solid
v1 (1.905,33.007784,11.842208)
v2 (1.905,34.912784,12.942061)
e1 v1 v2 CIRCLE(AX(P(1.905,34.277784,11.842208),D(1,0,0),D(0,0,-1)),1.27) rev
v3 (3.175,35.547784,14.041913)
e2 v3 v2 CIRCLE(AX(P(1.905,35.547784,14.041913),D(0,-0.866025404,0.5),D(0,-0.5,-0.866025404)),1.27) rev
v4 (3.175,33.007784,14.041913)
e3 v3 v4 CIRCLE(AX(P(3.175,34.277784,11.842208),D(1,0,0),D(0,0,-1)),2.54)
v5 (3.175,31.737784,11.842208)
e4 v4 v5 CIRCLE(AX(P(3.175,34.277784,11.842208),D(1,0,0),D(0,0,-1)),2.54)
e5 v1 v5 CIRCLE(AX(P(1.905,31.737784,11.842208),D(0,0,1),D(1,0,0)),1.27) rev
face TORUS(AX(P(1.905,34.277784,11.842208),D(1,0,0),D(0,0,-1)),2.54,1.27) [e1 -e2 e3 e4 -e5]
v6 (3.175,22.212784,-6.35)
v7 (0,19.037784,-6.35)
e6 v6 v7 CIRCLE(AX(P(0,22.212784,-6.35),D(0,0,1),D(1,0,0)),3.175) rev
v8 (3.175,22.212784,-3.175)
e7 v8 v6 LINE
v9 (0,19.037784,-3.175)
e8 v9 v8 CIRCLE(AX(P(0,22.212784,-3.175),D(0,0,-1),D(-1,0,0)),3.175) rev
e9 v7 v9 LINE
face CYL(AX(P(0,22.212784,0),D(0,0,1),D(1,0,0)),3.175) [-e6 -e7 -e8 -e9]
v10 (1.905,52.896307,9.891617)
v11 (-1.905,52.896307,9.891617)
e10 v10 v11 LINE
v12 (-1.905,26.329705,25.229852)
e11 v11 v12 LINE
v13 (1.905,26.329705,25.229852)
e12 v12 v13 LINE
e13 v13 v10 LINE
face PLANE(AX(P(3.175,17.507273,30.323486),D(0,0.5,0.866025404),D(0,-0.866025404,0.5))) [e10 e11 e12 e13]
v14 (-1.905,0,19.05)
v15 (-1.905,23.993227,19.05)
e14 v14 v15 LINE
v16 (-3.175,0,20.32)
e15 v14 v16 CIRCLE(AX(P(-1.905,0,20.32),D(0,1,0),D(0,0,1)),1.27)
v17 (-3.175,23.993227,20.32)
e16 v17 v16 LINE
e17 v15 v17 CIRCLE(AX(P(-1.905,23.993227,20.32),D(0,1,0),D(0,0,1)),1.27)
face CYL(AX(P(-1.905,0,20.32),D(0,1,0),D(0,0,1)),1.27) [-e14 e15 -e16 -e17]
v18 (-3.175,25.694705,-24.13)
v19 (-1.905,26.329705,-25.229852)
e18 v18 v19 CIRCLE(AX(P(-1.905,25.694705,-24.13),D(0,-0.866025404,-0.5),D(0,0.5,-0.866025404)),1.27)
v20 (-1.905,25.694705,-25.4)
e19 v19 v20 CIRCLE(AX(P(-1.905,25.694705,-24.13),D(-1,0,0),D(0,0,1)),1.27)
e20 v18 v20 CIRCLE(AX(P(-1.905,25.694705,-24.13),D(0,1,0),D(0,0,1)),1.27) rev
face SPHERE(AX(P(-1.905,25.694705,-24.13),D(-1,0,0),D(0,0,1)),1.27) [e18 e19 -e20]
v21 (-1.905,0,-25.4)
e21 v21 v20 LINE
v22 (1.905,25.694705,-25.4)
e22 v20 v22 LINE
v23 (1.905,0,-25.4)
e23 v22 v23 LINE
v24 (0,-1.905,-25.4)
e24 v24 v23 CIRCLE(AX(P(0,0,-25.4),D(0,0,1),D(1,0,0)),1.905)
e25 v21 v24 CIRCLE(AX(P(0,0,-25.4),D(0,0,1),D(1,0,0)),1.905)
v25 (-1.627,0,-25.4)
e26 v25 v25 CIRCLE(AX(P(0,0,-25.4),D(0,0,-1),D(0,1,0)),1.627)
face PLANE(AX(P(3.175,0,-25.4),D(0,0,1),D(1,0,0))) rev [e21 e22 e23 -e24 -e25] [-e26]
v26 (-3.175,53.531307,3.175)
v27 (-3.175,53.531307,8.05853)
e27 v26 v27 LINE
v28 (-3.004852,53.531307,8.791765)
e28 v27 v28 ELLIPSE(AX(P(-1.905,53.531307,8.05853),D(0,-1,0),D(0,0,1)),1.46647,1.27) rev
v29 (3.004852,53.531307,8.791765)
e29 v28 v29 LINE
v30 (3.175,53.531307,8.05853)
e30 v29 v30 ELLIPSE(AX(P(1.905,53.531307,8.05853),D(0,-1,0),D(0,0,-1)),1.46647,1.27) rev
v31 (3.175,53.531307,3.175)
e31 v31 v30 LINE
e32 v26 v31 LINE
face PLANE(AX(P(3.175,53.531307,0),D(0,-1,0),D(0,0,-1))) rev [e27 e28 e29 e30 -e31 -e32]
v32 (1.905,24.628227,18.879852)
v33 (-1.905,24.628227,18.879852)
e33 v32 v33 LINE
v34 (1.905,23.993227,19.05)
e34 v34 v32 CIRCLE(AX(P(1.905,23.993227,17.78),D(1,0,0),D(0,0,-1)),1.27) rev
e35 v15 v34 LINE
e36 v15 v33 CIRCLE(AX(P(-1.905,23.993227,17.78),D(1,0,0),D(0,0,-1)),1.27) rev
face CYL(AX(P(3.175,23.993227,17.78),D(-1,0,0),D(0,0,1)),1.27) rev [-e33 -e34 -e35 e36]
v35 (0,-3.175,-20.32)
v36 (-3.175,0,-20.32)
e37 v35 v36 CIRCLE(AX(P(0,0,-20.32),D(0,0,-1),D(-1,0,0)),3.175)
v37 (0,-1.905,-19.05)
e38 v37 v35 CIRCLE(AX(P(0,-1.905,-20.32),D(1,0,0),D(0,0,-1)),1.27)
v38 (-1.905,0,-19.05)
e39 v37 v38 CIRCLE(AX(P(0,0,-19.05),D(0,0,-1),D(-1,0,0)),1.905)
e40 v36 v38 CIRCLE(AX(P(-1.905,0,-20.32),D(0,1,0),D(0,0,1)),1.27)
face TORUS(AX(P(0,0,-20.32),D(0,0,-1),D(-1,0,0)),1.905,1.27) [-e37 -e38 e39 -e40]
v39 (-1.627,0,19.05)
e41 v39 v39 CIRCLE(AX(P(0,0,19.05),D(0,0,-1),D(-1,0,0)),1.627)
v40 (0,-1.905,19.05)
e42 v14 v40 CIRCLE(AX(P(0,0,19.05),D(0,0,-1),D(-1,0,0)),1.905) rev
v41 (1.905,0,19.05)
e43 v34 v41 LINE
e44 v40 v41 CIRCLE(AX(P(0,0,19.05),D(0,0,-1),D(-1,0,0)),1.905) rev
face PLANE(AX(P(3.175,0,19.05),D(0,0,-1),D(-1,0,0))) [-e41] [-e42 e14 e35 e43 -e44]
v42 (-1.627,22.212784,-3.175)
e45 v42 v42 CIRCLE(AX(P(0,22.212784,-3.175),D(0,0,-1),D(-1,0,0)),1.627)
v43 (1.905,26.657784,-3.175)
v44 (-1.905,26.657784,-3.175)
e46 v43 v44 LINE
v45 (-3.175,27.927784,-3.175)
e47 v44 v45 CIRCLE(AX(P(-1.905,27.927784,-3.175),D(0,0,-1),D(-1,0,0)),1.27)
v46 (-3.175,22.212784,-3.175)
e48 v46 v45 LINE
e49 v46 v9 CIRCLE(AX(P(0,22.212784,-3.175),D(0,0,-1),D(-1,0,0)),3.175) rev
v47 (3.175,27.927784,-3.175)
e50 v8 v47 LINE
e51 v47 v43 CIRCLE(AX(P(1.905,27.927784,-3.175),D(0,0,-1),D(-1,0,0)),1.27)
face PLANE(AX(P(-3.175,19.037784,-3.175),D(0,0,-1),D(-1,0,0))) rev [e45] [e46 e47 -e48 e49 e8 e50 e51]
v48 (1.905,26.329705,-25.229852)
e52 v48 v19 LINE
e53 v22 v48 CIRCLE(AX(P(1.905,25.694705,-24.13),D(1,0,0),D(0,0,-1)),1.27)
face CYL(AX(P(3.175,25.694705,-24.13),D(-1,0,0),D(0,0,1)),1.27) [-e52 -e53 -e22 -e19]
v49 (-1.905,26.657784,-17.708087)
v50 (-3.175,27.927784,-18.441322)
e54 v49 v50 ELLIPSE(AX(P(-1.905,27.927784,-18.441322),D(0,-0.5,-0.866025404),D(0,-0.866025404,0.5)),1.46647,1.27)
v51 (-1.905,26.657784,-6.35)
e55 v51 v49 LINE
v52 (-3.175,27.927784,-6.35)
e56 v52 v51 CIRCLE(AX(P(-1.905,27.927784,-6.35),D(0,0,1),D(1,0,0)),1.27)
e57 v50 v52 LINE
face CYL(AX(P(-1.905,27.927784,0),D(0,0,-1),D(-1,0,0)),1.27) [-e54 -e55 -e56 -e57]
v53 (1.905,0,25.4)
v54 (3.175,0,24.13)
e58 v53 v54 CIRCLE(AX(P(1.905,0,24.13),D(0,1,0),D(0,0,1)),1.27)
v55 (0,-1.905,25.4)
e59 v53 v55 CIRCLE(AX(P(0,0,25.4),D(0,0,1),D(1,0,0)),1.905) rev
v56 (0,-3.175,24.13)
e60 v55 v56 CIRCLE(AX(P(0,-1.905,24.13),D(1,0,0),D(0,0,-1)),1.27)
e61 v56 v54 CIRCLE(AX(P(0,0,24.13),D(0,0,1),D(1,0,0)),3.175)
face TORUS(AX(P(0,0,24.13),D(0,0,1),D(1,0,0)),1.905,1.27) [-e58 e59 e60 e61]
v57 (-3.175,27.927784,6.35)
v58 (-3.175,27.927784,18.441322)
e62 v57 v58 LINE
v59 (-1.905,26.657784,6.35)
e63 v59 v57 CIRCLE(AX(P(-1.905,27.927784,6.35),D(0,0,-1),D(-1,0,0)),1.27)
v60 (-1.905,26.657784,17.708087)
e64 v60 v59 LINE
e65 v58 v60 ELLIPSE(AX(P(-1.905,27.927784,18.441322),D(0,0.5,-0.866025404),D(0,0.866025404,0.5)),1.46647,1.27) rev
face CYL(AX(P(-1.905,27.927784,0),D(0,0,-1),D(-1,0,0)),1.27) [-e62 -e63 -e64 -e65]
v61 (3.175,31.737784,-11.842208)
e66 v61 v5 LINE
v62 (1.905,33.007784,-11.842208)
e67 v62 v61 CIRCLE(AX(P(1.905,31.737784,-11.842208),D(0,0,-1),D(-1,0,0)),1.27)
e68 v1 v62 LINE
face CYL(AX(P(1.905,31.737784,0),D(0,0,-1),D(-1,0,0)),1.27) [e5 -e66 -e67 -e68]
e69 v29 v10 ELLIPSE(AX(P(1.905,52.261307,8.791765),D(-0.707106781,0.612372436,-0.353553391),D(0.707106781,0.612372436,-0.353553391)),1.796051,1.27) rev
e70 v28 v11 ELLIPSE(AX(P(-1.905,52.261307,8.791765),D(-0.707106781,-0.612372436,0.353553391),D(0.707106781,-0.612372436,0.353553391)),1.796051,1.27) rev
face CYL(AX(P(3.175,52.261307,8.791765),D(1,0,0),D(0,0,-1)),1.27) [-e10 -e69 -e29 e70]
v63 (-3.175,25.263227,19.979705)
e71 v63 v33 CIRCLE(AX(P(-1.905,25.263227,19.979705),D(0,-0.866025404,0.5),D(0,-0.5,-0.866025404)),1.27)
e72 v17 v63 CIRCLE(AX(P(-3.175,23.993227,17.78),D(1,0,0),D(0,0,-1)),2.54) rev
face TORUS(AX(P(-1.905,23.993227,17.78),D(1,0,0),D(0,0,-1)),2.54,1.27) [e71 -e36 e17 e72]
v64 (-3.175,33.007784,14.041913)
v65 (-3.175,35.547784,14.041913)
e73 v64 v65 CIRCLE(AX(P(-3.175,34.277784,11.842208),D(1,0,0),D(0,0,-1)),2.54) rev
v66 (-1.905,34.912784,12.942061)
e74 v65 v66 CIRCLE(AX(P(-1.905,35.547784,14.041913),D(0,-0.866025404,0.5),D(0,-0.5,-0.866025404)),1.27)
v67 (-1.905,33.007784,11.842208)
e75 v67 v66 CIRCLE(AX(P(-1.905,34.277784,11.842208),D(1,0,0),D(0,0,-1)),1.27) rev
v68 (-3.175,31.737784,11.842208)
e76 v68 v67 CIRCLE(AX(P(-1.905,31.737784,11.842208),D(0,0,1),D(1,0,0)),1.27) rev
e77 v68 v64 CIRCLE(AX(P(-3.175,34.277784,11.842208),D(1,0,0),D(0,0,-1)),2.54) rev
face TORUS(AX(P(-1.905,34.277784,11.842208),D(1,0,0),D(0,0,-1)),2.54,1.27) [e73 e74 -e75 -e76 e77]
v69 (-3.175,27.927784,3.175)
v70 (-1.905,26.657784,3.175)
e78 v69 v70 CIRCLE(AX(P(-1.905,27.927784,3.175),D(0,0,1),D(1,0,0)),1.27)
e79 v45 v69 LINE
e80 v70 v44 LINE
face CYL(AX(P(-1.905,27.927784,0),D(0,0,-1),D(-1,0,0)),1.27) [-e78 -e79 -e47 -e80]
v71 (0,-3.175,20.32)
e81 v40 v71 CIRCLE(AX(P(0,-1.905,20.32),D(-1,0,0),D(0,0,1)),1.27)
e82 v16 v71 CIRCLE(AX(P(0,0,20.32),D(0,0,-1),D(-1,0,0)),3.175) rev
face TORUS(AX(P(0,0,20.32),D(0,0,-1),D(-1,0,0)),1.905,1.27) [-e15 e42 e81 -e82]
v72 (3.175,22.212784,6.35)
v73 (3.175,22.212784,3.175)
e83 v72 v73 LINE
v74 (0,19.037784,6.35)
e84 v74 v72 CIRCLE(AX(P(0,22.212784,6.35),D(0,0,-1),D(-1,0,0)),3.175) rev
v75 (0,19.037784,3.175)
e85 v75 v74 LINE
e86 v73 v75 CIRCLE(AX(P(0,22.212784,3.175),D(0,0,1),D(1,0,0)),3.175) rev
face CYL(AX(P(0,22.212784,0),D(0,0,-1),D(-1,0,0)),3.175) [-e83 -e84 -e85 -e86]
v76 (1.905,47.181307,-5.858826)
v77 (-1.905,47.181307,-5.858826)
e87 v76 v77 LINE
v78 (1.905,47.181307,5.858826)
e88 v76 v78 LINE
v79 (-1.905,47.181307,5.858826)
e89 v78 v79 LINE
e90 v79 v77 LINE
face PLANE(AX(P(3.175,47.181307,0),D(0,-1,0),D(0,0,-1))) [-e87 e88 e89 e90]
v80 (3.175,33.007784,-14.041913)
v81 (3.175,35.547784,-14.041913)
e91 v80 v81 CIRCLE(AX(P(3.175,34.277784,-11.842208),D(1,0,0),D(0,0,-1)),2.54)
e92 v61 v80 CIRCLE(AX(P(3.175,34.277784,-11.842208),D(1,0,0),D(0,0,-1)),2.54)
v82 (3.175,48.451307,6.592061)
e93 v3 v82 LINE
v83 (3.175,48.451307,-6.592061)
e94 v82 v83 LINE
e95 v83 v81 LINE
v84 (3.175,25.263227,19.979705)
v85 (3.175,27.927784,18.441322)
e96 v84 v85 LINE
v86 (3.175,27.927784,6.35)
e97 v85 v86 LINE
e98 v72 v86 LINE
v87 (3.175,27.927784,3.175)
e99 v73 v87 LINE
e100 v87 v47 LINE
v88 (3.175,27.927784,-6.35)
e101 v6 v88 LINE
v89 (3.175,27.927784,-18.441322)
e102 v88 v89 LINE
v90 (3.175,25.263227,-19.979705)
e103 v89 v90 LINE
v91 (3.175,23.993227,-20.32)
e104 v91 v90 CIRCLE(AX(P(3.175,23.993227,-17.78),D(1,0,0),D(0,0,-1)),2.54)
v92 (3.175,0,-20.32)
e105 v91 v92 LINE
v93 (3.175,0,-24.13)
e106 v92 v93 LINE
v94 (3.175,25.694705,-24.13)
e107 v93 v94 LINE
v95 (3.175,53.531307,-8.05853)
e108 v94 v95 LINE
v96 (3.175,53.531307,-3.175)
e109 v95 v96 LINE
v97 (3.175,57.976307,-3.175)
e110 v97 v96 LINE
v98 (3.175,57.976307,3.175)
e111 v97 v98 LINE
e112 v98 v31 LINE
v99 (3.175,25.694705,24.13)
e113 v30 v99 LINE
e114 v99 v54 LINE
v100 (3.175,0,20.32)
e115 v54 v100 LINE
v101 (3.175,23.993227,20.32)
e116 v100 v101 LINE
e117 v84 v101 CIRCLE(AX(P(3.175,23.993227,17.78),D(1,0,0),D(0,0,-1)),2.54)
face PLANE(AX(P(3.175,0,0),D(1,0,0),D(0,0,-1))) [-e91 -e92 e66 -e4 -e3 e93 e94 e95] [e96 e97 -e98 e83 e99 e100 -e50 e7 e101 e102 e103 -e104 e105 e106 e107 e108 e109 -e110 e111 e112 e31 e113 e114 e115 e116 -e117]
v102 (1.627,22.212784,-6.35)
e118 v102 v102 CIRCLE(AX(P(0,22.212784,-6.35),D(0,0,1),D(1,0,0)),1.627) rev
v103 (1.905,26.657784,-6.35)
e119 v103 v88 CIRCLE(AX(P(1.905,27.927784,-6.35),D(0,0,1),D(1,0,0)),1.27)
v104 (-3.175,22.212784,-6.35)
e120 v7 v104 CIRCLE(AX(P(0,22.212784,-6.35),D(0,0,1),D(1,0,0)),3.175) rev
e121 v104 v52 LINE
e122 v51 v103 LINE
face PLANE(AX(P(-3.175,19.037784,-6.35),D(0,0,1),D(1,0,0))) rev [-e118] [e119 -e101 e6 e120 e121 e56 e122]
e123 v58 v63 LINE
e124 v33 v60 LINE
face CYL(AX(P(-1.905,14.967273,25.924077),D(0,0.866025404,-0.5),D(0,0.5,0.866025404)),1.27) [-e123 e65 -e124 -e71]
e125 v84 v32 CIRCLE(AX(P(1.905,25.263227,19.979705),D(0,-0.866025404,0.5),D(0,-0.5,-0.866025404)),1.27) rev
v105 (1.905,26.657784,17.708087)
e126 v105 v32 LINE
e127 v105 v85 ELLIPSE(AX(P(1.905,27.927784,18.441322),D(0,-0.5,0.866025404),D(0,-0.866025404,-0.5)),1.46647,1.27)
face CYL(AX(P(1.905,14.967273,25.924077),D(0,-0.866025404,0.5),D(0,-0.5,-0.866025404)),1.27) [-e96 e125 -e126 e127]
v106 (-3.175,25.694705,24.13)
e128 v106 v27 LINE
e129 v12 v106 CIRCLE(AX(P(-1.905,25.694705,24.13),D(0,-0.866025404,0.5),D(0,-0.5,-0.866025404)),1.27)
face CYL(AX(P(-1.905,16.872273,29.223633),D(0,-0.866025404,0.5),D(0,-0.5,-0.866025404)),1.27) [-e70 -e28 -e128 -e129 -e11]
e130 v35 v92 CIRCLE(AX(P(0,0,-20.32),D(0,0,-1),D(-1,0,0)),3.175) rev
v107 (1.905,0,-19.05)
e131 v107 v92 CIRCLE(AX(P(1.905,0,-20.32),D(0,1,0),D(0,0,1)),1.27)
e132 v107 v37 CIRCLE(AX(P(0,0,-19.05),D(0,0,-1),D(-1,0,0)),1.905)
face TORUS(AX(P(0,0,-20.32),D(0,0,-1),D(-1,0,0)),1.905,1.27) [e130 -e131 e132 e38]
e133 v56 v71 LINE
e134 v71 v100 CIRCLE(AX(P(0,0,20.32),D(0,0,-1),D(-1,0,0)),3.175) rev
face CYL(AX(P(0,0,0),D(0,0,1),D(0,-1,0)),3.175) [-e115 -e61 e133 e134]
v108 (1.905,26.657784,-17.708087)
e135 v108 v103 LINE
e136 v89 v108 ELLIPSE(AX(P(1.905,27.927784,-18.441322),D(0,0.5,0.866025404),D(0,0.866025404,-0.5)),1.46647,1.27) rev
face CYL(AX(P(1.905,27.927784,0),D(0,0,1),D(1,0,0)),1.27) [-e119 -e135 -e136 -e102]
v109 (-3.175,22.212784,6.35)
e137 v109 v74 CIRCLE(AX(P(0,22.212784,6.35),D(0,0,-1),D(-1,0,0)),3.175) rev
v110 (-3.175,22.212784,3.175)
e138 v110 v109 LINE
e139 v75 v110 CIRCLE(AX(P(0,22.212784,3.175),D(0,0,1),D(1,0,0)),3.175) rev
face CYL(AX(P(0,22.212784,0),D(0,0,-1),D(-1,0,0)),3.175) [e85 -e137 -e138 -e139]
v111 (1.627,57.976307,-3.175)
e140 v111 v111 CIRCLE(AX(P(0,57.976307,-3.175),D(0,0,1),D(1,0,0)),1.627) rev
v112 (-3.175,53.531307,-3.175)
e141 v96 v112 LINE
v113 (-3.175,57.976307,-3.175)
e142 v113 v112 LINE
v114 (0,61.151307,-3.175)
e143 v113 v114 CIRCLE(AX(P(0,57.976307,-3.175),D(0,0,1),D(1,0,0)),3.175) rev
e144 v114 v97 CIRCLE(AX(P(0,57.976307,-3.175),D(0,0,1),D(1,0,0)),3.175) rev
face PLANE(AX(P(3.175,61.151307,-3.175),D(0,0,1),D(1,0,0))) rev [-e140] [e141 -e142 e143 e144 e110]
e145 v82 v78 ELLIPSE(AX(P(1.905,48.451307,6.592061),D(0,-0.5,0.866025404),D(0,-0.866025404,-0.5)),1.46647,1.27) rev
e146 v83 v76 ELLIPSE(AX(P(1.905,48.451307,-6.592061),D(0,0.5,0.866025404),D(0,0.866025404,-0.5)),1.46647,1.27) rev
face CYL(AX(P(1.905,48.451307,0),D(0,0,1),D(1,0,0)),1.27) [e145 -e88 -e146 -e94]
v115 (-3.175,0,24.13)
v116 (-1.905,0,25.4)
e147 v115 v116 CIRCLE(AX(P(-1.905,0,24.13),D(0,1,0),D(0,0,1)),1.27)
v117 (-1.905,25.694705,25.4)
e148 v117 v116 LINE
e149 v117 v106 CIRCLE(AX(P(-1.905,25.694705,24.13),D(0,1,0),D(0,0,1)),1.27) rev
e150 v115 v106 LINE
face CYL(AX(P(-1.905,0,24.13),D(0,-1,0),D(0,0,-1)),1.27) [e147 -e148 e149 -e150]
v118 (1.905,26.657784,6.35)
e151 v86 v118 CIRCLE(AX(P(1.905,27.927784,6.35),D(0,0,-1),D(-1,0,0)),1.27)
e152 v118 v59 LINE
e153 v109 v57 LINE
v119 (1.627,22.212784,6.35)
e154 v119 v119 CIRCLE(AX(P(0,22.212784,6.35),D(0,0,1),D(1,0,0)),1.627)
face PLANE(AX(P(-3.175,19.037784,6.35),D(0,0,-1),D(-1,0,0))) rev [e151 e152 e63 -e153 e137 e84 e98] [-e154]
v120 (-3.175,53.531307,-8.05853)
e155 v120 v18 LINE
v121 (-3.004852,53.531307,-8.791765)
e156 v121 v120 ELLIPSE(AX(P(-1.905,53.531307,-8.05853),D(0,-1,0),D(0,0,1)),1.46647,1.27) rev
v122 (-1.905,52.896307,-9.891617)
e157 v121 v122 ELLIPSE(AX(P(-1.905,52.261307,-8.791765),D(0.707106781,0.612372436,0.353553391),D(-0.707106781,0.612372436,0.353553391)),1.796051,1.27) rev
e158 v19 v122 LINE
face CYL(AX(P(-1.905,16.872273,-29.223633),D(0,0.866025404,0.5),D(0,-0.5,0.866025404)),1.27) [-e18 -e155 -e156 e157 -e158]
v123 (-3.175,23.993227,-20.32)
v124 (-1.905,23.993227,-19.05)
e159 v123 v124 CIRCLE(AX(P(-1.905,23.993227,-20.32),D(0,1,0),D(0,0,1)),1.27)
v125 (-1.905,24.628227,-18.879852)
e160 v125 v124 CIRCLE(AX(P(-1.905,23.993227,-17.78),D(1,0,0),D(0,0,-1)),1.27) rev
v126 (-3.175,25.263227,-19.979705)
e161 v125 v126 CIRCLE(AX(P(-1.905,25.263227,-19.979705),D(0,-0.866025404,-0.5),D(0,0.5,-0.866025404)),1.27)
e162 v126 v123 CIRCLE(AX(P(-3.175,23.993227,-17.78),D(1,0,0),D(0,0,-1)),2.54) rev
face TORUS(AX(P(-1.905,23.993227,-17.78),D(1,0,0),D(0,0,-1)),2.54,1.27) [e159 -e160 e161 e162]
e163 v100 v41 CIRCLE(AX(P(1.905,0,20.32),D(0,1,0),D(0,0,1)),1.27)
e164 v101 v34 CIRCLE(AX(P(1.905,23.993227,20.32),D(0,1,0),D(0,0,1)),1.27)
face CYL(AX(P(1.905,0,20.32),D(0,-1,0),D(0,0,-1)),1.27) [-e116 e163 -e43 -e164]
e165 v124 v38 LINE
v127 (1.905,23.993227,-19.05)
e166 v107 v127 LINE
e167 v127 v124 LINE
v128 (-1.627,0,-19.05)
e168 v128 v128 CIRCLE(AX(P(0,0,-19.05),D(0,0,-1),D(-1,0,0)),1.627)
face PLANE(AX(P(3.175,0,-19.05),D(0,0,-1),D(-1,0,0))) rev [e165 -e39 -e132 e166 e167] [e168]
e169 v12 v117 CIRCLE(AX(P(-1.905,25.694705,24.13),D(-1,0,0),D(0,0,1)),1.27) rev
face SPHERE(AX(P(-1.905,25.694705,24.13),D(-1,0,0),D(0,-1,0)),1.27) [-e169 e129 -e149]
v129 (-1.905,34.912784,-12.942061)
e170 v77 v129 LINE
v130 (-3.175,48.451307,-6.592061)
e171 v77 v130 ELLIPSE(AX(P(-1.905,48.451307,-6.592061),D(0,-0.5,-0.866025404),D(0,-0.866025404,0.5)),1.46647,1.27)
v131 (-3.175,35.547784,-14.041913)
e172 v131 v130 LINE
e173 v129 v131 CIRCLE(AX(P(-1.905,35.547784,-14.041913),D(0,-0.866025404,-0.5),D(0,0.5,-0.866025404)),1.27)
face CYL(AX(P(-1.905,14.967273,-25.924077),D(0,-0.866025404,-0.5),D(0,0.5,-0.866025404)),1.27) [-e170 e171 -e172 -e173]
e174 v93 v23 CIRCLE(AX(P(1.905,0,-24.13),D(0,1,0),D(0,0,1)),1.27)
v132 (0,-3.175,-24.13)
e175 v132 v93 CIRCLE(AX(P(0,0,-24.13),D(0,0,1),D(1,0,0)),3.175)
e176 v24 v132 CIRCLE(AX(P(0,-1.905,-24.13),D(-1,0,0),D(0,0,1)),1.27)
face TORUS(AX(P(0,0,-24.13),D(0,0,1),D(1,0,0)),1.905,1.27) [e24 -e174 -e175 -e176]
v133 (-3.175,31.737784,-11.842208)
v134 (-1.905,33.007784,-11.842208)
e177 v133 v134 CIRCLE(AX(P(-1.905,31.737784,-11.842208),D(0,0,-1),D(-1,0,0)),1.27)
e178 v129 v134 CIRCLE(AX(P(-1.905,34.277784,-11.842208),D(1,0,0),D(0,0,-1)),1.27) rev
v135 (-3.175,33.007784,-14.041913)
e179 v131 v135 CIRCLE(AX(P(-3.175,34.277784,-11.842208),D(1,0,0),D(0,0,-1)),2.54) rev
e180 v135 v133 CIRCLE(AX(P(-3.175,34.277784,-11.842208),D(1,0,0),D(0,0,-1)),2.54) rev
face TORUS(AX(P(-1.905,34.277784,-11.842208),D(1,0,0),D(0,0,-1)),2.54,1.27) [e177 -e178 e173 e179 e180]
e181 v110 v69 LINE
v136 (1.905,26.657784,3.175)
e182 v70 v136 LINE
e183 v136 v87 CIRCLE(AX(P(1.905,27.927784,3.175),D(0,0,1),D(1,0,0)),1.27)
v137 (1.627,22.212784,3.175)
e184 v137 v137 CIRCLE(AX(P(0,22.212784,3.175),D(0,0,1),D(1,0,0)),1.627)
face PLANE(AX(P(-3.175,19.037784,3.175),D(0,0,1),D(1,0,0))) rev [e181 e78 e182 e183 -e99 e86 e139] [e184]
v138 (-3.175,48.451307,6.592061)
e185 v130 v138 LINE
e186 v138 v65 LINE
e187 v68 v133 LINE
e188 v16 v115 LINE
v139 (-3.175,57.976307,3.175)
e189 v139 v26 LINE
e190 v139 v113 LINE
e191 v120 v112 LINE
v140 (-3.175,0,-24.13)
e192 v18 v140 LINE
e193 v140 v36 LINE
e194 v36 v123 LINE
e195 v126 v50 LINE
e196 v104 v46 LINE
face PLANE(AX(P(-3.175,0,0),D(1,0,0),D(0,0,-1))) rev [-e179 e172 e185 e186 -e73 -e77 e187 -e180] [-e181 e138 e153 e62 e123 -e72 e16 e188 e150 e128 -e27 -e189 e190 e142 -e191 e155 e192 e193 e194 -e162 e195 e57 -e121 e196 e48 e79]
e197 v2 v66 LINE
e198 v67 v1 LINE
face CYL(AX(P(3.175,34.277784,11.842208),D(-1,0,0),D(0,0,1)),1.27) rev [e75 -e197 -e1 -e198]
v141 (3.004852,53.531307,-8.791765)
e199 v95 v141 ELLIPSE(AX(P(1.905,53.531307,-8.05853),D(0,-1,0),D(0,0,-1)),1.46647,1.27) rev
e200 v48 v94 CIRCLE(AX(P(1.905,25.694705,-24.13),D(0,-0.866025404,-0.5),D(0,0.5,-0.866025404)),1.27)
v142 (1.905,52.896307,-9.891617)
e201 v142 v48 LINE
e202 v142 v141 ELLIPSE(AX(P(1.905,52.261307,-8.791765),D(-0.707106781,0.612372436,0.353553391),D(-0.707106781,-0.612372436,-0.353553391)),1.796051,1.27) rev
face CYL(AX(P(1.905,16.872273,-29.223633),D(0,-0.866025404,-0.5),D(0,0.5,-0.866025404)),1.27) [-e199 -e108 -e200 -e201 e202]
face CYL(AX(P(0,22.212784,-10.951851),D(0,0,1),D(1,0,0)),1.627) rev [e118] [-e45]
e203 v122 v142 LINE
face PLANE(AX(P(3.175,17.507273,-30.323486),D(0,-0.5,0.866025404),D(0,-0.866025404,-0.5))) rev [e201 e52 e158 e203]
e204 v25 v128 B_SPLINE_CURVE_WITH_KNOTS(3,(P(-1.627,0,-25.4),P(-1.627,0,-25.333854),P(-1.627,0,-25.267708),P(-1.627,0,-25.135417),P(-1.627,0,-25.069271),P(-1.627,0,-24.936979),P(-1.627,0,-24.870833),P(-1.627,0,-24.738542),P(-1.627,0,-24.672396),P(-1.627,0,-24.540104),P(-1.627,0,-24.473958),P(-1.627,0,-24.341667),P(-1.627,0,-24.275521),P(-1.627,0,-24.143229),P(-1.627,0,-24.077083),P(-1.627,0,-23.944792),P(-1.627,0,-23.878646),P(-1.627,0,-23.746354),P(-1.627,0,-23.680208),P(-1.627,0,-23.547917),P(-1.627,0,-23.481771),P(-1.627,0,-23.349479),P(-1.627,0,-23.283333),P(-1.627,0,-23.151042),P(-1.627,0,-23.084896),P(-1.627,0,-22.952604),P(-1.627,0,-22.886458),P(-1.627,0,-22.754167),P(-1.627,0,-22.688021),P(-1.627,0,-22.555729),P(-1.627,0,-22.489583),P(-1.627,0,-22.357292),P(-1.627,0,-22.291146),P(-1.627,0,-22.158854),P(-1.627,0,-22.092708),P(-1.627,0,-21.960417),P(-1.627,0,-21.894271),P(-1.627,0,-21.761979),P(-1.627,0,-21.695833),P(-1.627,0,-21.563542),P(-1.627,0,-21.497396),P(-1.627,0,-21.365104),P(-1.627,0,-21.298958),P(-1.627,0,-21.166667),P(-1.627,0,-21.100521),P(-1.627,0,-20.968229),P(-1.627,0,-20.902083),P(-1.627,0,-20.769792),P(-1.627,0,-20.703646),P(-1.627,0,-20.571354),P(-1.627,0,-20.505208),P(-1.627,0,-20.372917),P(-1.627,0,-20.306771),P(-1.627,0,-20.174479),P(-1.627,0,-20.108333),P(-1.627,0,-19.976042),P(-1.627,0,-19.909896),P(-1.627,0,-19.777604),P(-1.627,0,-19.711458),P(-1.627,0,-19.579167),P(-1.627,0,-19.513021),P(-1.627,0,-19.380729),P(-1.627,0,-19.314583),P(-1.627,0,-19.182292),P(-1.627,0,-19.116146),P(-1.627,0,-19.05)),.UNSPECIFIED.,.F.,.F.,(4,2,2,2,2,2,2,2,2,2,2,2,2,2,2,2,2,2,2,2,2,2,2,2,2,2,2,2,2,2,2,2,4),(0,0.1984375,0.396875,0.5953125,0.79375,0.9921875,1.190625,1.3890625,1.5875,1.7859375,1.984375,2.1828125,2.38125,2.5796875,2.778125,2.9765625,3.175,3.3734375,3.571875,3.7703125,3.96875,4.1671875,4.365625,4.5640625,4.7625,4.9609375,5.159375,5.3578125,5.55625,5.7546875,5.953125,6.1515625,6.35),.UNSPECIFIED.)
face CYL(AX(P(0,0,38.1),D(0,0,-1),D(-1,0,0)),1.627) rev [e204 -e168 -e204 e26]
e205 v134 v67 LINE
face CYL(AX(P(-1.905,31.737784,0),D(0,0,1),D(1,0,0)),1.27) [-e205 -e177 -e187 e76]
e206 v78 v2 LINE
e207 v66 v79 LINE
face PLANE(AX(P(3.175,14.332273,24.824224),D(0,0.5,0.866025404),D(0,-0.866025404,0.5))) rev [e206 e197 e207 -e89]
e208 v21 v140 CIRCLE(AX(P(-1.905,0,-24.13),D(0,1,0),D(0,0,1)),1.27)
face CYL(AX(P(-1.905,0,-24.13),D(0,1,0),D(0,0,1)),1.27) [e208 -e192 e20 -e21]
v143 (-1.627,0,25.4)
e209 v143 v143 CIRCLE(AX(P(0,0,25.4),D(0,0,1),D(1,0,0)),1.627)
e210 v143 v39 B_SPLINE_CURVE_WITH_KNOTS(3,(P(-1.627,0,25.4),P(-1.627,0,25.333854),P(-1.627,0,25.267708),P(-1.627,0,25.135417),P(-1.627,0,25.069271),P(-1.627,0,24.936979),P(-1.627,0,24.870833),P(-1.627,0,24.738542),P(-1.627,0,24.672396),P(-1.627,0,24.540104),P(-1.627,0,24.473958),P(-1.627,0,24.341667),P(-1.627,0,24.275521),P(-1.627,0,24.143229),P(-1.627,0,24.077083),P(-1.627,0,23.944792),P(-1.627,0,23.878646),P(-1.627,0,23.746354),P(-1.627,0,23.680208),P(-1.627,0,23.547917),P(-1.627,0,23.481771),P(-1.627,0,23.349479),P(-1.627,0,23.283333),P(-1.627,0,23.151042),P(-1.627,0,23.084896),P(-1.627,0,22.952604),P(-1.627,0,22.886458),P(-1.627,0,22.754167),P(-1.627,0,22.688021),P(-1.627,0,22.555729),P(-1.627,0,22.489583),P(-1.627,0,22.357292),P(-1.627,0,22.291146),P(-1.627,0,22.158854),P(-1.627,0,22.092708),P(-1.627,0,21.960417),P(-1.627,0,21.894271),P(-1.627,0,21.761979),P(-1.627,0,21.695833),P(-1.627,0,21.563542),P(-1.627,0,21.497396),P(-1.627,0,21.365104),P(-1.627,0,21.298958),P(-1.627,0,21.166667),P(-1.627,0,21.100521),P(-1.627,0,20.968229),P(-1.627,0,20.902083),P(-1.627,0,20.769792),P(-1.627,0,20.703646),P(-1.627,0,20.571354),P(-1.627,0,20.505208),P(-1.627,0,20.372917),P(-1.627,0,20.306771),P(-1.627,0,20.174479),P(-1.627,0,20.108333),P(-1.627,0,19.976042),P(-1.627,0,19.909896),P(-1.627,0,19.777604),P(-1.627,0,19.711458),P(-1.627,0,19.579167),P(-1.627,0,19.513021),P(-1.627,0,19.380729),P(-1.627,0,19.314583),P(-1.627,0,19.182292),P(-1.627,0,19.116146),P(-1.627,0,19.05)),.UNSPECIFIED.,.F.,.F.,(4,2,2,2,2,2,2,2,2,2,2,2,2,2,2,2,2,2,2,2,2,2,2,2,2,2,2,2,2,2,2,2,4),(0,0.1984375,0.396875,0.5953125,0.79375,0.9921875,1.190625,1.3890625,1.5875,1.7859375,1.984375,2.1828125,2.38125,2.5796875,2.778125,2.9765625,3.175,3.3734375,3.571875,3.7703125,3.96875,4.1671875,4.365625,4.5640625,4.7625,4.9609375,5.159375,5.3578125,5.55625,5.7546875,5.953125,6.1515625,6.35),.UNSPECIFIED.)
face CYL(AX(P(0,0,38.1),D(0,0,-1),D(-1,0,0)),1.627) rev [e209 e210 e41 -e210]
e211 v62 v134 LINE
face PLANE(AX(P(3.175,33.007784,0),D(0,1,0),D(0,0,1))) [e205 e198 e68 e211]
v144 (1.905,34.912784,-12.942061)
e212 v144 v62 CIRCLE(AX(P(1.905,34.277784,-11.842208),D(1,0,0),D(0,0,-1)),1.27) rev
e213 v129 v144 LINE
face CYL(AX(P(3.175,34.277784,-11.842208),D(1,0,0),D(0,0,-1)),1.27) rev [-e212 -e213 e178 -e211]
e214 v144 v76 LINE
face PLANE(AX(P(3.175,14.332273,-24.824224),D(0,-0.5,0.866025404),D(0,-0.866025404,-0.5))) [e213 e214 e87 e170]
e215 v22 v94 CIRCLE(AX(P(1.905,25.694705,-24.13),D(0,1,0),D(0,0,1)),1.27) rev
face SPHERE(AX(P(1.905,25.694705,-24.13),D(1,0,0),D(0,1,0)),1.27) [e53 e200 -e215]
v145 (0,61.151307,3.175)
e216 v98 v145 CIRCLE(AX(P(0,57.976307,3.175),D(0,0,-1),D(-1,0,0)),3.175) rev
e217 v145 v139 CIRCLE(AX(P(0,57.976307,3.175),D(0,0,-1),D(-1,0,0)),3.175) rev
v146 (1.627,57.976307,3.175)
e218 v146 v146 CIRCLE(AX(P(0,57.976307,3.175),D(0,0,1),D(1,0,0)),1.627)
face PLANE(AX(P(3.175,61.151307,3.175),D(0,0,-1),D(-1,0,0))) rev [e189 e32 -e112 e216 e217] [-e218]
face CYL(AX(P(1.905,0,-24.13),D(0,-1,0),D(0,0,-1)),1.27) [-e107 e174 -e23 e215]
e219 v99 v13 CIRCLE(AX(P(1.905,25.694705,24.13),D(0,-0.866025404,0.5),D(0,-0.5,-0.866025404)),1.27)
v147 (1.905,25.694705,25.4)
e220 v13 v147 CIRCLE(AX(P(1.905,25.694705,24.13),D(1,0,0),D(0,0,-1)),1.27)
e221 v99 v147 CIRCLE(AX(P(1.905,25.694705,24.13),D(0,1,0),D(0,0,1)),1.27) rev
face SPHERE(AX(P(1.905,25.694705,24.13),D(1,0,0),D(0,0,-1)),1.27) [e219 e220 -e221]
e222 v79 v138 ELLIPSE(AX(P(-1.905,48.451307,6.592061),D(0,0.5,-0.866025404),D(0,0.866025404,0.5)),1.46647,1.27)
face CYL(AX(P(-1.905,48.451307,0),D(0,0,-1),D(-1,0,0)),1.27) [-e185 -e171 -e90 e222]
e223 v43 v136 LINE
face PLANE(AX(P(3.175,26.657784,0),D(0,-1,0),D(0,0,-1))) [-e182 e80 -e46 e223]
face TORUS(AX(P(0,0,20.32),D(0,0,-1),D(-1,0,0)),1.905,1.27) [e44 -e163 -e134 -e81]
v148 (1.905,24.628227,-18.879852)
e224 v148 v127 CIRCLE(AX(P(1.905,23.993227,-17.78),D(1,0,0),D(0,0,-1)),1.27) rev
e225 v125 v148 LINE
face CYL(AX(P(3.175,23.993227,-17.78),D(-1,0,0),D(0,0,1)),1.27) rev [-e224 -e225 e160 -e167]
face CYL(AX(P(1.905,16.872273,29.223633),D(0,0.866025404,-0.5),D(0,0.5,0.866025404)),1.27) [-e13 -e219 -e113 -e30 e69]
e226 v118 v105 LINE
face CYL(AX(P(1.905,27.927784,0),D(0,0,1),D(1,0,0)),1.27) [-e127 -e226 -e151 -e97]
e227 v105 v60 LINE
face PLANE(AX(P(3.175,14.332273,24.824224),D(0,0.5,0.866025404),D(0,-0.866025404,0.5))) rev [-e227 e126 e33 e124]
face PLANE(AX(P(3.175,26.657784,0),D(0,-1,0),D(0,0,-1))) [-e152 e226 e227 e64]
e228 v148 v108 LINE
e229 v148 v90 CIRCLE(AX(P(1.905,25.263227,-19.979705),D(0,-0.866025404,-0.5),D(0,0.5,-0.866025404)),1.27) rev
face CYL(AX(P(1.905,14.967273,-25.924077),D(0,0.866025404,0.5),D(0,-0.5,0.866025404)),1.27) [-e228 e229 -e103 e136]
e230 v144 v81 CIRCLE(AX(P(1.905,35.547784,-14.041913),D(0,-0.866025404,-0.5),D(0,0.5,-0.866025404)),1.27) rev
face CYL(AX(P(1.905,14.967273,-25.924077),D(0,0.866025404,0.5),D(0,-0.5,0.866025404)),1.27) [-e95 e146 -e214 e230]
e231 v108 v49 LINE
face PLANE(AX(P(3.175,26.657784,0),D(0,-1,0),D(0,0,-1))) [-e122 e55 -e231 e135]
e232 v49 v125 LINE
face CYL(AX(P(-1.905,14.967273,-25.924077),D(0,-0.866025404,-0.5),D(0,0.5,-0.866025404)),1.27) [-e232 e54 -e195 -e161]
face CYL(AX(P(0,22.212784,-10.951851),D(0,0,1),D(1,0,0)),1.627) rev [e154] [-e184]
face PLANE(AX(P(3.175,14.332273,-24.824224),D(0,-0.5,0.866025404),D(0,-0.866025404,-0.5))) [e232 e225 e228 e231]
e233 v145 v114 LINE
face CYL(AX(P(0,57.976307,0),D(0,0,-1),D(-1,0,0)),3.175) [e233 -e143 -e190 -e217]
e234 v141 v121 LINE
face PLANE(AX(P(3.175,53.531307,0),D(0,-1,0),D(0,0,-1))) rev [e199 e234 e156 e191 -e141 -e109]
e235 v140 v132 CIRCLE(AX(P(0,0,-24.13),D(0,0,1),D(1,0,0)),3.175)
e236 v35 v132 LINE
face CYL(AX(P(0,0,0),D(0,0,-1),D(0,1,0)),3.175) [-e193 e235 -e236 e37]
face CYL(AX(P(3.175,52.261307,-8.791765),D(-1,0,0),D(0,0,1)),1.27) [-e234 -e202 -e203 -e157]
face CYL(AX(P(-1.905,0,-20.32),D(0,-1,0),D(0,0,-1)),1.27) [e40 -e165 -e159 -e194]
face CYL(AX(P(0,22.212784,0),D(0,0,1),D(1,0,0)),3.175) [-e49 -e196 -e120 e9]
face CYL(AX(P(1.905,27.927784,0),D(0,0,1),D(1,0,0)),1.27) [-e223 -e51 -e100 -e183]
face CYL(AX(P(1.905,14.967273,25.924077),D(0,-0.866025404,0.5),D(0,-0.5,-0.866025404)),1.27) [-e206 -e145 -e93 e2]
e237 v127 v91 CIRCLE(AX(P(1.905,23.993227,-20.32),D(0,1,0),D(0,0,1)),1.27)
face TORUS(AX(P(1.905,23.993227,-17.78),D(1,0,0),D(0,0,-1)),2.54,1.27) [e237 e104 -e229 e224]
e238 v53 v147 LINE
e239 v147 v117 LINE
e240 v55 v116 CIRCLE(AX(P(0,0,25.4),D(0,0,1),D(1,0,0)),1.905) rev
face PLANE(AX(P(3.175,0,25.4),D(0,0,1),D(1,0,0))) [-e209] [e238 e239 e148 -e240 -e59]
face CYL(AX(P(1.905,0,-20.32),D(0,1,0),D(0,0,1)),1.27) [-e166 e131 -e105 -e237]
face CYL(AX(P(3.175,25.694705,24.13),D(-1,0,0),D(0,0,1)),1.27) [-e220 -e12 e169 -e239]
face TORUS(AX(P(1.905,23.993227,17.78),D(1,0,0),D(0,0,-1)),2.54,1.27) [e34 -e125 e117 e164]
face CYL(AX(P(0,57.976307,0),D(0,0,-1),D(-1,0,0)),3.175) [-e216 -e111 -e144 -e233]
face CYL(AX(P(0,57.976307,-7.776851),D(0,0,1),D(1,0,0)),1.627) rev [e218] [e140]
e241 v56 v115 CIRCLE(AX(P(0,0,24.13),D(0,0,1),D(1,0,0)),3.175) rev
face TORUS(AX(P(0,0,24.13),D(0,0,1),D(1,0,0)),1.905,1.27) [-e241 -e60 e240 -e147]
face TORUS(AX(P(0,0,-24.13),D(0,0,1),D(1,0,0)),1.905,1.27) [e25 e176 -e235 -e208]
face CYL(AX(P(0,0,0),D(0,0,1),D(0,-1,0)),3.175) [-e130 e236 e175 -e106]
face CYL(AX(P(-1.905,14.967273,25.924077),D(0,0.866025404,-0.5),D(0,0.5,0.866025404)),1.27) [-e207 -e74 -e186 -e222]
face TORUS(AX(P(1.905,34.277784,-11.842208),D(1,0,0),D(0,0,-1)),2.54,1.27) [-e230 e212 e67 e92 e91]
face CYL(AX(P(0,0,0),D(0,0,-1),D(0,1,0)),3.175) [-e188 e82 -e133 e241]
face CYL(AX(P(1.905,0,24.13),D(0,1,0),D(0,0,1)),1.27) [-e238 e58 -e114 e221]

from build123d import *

# Parameters (mm, degrees)
BOSS_EXTRUDE1_DEPTH = 3.175
SKETCH4_W           = 6.35
SKETCH4_H           = 3.175
BOSS_EXTRUDE3_DEPTH = 7.62
FILLET2_R           = 1.27
SKETCH8_W           = 6.35
SKETCH8_H           = 6.35
BOSS_EXTRUDE5_DEPTH = 7.62
SKETCH7_R           = 1.627
CUT_EXTRUDE3_DEPTH  = 63.5
FILLET3_R           = 3.175
SKETCH9_R           = 1.627
CUT_EXTRUDE4_DEPTH  = 6.35
CUT_EXTRUDE5_REACH  = 70.976
SKETCH10_R          = 1.627


with BuildPart() as part:
    # Sketch2 → Boss-Extrude1 (new, symmetric)
    with BuildSketch(Plane(origin=(0, 0, 0), x_dir=(0, 0, -1), z_dir=(1, 0, 0))):
        Polygon((-25.4, 26.035), (-25.4, 3.175), (-25.4, -3.175), (-19.05, -3.175), (-19.05, 3.175), (-19.05, 9.525), (-19.05, 24.333522628), (-17.708087105, 26.657783942), (17.708087105, 26.657783942), (19.05, 24.333522628), (19.05, 3.175), (19.05, -3.175), (25.4, -3.175), (25.4, 3.175), (25.4, 26.035), (9.525, 53.53130657), (0, 53.53130657), (-9.525, 53.53130657), align=None)
        Polygon((-14.041912895, 33.007783942), (-5.858825791, 47.18130657), (0, 47.18130657), (5.858825791, 47.18130657), (14.041912895, 33.007783942), align=None, mode=Mode.SUBTRACT)
    extrude(amount=BOSS_EXTRUDE1_DEPTH, both=True)

    # Sketch4 → Boss-Extrude3 (add)
    with BuildSketch(Plane.XZ.offset(-26.657783942)):
        with Locations((0, -4.7625)):
            Rectangle(SKETCH4_W, SKETCH4_H)
        with Locations((0, 4.7625)):
            Rectangle(SKETCH4_W, SKETCH4_H)
    extrude(amount=BOSS_EXTRUDE3_DEPTH)

    # Fillet2
    fillet2_edges = [part.edges().sort_by_distance(p)[0] for p in [
        (3.175, 40.094545256, -9.950369343),
        (3.175, 33.007783942, 0),
        (-3.175, 26.657783942, -12.029043552),
        (-3.175, 25.495653285, 18.379043552),
        (-3.175, 10.579261314, 19.05),
        (-3.175, 11.43, 25.4),
        (-3.175, 39.783153285, 17.4625),
        (-3.175, 39.783153285, -17.4625),
        (3.175, 40.094545256, 9.950369343),
        (-3.175, 11.43, -25.4),
        (-3.175, 10.579261314, -19.05),
        (-3.175, 25.495653285, -18.379043552),
        (-3.175, 40.094545256, 9.950369343),
        (-3.175, 33.007783942, 0),
        (-3.175, 40.094545256, -9.950369343),
        (-3.175, 47.18130657, 0),
        (3.175, 25.495653285, -18.379043552),
        (0, 24.333522628, 19.05),
        (0, -3.175, 19.05),
        (3.175, 10.579261314, -19.05),
        (0, -3.175, 25.4),
        (0, 26.035, 25.4),
        (0, 53.53130657, 9.525),
        (0, 53.53130657, -9.525),
        (0, 26.035, -25.4),
        (0, -3.175, -25.4),
        (0, -3.175, -19.05),
        (0, 24.333522628, -19.05),
        (0, 33.007783942, 14.041912895),
        (0, 33.007783942, -14.041912895),
        (3.175, 11.43, -25.4),
        (3.175, 39.783153285, -17.4625),
        (-3.175, 26.657783942, 12.029043552),
        (3.175, 26.657783942, 12.029043552),
        (3.175, 39.783153285, 17.4625),
        (3.175, 11.43, 25.4),
        (-3.175, 26.657783942, 0),
        (3.175, 26.657783942, 0),
        (3.175, 47.18130657, 0),
        (3.175, 10.579261314, 19.05),
        (3.175, 25.495653285, 18.379043552),
        (3.175, 26.657783942, -12.029043552),
    ]]
    fillet(fillet2_edges, radius=FILLET2_R)

    # Sketch8 → Boss-Extrude5 (add)
    with BuildSketch(Plane(origin=(0, 53.53130657, 0), x_dir=(1, 0, 0), z_dir=(0, 1, 0))):
        Rectangle(SKETCH8_W, SKETCH8_H)
    extrude(amount=BOSS_EXTRUDE5_DEPTH)

    # Sketch7 → Cut-Extrude3 (cut)
    with BuildSketch(Plane(origin=(0, 0, -25.4), x_dir=(-1, 0, 0), z_dir=(0, 0, -1))):
        Circle(SKETCH7_R)
    extrude(amount=-CUT_EXTRUDE3_DEPTH, mode=Mode.SUBTRACT)

    # Fillet3
    # the kernel refuses this fillet: 3.175 mm, written as the material it takes off along each edge
    with BuildSketch(Plane(origin=(0, 0, 25.4), x_dir=(0, -1, 0), z_dir=(-1, 0, 0))) as fillet3_piece_1:
        with BuildLine():
            CenterArc((1.905, -1.27), 1.27, 0, 90)
            Line((3.175, -1.27), (3.175, 0))
            Line((3.175, 0), (1.905, 0))
        make_face()
    revolve(axis=Axis((0, 0, 25.4), (0, 0, 1)), revolution_arc=90, mode=Mode.SUBTRACT)
    with BuildSketch(Plane(origin=(0, 0, 19.05), x_dir=(1, 0, 0), z_dir=(0, 1, 0))) as fillet3_piece_2:
        with BuildLine():
            CenterArc((1.905, -1.27), 1.27, 0, 90)
            Line((3.175, -1.27), (3.175, 0))
            Line((3.175, 0), (1.905, 0))
        make_face()
    revolve(axis=Axis((0, 0, 19.05), (0, 0, -1)), revolution_arc=90, mode=Mode.SUBTRACT)
    with BuildSketch(Plane(origin=(0, 0, 25.4), x_dir=(-1, 0, 0), z_dir=(0, 1, 0))) as fillet3_piece_3:
        with BuildLine():
            CenterArc((1.905, -1.27), 1.27, 0, 90)
            Line((3.175, -1.27), (3.175, 0))
            Line((3.175, 0), (1.905, 0))
        make_face()
    revolve(axis=Axis((0, 0, 25.4), (0, 0, 1)), revolution_arc=90, mode=Mode.SUBTRACT)
    with BuildSketch(Plane(origin=(0, 0, 19.05), x_dir=(0, -1, 0), z_dir=(1, 0, 0))) as fillet3_piece_4:
        with BuildLine():
            CenterArc((1.905, -1.27), 1.27, 0, 90)
            Line((3.175, -1.27), (3.175, 0))
            Line((3.175, 0), (1.905, 0))
        make_face()
    revolve(axis=Axis((0, 0, 19.05), (0, 0, -1)), revolution_arc=90, mode=Mode.SUBTRACT)
    with BuildSketch(Plane(origin=(0, 0, -25.4), x_dir=(1, 0, 0), z_dir=(0, 1, 0))) as fillet3_piece_5:
        with BuildLine():
            CenterArc((1.905, -1.27), 1.27, 0, 90)
            Line((3.175, -1.27), (3.175, 0))
            Line((3.175, 0), (1.905, 0))
        make_face()
    revolve(axis=Axis((0, 0, -25.4), (0, 0, -1)), revolution_arc=90, mode=Mode.SUBTRACT)
    with BuildSketch(Plane(origin=(0, 0, -25.4), x_dir=(0, -1, 0), z_dir=(1, 0, 0))) as fillet3_piece_6:
        with BuildLine():
            CenterArc((1.905, -1.27), 1.27, 0, 90)
            Line((3.175, -1.27), (3.175, 0))
            Line((3.175, 0), (1.905, 0))
        make_face()
    revolve(axis=Axis((0, 0, -25.4), (0, 0, -1)), revolution_arc=90, mode=Mode.SUBTRACT)
    with BuildSketch(Plane(origin=(0, 0, -19.05), x_dir=(0, -1, 0), z_dir=(-1, 0, 0))) as fillet3_piece_7:
        with BuildLine():
            CenterArc((1.905, -1.27), 1.27, 0, 90)
            Line((3.175, -1.27), (3.175, 0))
            Line((3.175, 0), (1.905, 0))
        make_face()
    revolve(axis=Axis((0, 0, -19.05), (0, 0, 1)), revolution_arc=90, mode=Mode.SUBTRACT)
    with BuildSketch(Plane(origin=(0, 0, -19.05), x_dir=(-1, 0, 0), z_dir=(0, 1, 0))) as fillet3_piece_8:
        with BuildLine():
            CenterArc((1.905, -1.27), 1.27, 0, 90)
            Line((3.175, -1.27), (3.175, 0))
            Line((3.175, 0), (1.905, 0))
        make_face()
    revolve(axis=Axis((0, 0, -19.05), (0, 0, 1)), revolution_arc=90, mode=Mode.SUBTRACT)
    with BuildSketch(Plane(origin=(-3.175, 19.037783942, -4.7625), x_dir=(0, 1, 0), z_dir=(0, 0, 1)), Plane(origin=(3.175, 19.037783942, 14.2875), x_dir=(0, 1, 0), z_dir=(0, 0, -1))) as fillet3_piece_9:
        with BuildLine():
            CenterArc((FILLET3_R, -FILLET3_R), FILLET3_R, 90, 90)
            Line((0, -FILLET3_R), (0, 0))
            Line((0, 0), (FILLET3_R, 0))
        make_face()
    extrude(amount=19.05, mode=Mode.SUBTRACT)
    with BuildSketch(Plane(origin=(-3.175, 19.037783942, 4.7625), x_dir=(0, 1, 0), z_dir=(0, 0, -1)), Plane(origin=(3.175, 19.037783942, -14.2875), x_dir=(0, 1, 0), z_dir=(0, 0, 1))) as fillet3_piece_10:
        with BuildLine():
            CenterArc((FILLET3_R, FILLET3_R), FILLET3_R, 180, 90)
            Line((0, FILLET3_R), (0, 0))
            Line((0, 0), (FILLET3_R, 0))
        make_face()
    extrude(amount=19.05, mode=Mode.SUBTRACT)
    with BuildSketch(Plane(origin=(-3.175, 61.15130657, 11.1125), x_dir=(0, -1, 0), z_dir=(0, 0, -1)), Plane(origin=(3.175, 61.15130657, -11.1125), x_dir=(0, -1, 0), z_dir=(0, 0, 1))) as fillet3_piece_11:
        with BuildLine():
            CenterArc((FILLET3_R, -FILLET3_R), FILLET3_R, 90, 90)
            Line((0, -FILLET3_R), (0, 0))
            Line((0, 0), (FILLET3_R, 0))
        make_face()
    extrude(amount=22.225, mode=Mode.SUBTRACT)
    with BuildSketch(Plane(origin=(-3.175, -3.175, 25.4), x_dir=(0, 1, 0), z_dir=(0, 0, -1)), Plane(origin=(-3.175, -3.175, -19.05), x_dir=(0, 1, 0), z_dir=(0, 0, -1))) as fillet3_piece_12:
        with BuildLine():
            CenterArc((FILLET3_R, FILLET3_R), FILLET3_R, 180, 90)
            Line((0, FILLET3_R), (0, 0))
            Line((0, 0), (FILLET3_R, 0))
        make_face()
    extrude(amount=6.35, mode=Mode.SUBTRACT)
    with BuildSketch(Plane(origin=(3.175, -3.175, 25.4), x_dir=(0, 1, 0), z_dir=(0, 0, -1)), Plane(origin=(3.175, -3.175, -19.05), x_dir=(0, 1, 0), z_dir=(0, 0, -1))) as fillet3_piece_13:
        with BuildLine():
            CenterArc((FILLET3_R, -FILLET3_R), FILLET3_R, 90, 90)
            Line((0, -FILLET3_R), (0, 0))
            Line((0, 0), (FILLET3_R, 0))
        make_face()
    extrude(amount=6.35, mode=Mode.SUBTRACT)

    # Sketch9 → Cut-Extrude4 (cut)
    with BuildSketch(Plane.XY.offset(3.175)):
        with Locations((0, 57.97630657)):
            Circle(SKETCH9_R)
    extrude(amount=-CUT_EXTRUDE4_DEPTH, mode=Mode.SUBTRACT)

    # Cut-Extrude5: up to this face of the body (flat: up to its plane)
    cut_extrude5_end = Plane(part.part.faces().sort_by_distance((0, 23.210890681, -6.35))[0])
    # Sketch10 → Cut-Extrude5 (cut, up to the picked face)
    with BuildSketch(Plane.XY.offset(6.35), mode=Mode.PRIVATE) as cut_extrude5_sk1:
        with Locations((0, 22.212783942)):
            Circle(SKETCH10_R)
    cut_extrude5_tool1 = split(extrude(cut_extrude5_sk1.sketch, amount=-CUT_EXTRUDE5_REACH, mode=Mode.PRIVATE), bisect_by=cut_extrude5_end, keep=Keep.BOTH, mode=Mode.PRIVATE)
    add(cut_extrude5_tool1.solids().sort_by(Axis((0, 22.212784, 6.35), (0, 0, -1)))[0], mode=Mode.SUBTRACT)


solid = part.part
